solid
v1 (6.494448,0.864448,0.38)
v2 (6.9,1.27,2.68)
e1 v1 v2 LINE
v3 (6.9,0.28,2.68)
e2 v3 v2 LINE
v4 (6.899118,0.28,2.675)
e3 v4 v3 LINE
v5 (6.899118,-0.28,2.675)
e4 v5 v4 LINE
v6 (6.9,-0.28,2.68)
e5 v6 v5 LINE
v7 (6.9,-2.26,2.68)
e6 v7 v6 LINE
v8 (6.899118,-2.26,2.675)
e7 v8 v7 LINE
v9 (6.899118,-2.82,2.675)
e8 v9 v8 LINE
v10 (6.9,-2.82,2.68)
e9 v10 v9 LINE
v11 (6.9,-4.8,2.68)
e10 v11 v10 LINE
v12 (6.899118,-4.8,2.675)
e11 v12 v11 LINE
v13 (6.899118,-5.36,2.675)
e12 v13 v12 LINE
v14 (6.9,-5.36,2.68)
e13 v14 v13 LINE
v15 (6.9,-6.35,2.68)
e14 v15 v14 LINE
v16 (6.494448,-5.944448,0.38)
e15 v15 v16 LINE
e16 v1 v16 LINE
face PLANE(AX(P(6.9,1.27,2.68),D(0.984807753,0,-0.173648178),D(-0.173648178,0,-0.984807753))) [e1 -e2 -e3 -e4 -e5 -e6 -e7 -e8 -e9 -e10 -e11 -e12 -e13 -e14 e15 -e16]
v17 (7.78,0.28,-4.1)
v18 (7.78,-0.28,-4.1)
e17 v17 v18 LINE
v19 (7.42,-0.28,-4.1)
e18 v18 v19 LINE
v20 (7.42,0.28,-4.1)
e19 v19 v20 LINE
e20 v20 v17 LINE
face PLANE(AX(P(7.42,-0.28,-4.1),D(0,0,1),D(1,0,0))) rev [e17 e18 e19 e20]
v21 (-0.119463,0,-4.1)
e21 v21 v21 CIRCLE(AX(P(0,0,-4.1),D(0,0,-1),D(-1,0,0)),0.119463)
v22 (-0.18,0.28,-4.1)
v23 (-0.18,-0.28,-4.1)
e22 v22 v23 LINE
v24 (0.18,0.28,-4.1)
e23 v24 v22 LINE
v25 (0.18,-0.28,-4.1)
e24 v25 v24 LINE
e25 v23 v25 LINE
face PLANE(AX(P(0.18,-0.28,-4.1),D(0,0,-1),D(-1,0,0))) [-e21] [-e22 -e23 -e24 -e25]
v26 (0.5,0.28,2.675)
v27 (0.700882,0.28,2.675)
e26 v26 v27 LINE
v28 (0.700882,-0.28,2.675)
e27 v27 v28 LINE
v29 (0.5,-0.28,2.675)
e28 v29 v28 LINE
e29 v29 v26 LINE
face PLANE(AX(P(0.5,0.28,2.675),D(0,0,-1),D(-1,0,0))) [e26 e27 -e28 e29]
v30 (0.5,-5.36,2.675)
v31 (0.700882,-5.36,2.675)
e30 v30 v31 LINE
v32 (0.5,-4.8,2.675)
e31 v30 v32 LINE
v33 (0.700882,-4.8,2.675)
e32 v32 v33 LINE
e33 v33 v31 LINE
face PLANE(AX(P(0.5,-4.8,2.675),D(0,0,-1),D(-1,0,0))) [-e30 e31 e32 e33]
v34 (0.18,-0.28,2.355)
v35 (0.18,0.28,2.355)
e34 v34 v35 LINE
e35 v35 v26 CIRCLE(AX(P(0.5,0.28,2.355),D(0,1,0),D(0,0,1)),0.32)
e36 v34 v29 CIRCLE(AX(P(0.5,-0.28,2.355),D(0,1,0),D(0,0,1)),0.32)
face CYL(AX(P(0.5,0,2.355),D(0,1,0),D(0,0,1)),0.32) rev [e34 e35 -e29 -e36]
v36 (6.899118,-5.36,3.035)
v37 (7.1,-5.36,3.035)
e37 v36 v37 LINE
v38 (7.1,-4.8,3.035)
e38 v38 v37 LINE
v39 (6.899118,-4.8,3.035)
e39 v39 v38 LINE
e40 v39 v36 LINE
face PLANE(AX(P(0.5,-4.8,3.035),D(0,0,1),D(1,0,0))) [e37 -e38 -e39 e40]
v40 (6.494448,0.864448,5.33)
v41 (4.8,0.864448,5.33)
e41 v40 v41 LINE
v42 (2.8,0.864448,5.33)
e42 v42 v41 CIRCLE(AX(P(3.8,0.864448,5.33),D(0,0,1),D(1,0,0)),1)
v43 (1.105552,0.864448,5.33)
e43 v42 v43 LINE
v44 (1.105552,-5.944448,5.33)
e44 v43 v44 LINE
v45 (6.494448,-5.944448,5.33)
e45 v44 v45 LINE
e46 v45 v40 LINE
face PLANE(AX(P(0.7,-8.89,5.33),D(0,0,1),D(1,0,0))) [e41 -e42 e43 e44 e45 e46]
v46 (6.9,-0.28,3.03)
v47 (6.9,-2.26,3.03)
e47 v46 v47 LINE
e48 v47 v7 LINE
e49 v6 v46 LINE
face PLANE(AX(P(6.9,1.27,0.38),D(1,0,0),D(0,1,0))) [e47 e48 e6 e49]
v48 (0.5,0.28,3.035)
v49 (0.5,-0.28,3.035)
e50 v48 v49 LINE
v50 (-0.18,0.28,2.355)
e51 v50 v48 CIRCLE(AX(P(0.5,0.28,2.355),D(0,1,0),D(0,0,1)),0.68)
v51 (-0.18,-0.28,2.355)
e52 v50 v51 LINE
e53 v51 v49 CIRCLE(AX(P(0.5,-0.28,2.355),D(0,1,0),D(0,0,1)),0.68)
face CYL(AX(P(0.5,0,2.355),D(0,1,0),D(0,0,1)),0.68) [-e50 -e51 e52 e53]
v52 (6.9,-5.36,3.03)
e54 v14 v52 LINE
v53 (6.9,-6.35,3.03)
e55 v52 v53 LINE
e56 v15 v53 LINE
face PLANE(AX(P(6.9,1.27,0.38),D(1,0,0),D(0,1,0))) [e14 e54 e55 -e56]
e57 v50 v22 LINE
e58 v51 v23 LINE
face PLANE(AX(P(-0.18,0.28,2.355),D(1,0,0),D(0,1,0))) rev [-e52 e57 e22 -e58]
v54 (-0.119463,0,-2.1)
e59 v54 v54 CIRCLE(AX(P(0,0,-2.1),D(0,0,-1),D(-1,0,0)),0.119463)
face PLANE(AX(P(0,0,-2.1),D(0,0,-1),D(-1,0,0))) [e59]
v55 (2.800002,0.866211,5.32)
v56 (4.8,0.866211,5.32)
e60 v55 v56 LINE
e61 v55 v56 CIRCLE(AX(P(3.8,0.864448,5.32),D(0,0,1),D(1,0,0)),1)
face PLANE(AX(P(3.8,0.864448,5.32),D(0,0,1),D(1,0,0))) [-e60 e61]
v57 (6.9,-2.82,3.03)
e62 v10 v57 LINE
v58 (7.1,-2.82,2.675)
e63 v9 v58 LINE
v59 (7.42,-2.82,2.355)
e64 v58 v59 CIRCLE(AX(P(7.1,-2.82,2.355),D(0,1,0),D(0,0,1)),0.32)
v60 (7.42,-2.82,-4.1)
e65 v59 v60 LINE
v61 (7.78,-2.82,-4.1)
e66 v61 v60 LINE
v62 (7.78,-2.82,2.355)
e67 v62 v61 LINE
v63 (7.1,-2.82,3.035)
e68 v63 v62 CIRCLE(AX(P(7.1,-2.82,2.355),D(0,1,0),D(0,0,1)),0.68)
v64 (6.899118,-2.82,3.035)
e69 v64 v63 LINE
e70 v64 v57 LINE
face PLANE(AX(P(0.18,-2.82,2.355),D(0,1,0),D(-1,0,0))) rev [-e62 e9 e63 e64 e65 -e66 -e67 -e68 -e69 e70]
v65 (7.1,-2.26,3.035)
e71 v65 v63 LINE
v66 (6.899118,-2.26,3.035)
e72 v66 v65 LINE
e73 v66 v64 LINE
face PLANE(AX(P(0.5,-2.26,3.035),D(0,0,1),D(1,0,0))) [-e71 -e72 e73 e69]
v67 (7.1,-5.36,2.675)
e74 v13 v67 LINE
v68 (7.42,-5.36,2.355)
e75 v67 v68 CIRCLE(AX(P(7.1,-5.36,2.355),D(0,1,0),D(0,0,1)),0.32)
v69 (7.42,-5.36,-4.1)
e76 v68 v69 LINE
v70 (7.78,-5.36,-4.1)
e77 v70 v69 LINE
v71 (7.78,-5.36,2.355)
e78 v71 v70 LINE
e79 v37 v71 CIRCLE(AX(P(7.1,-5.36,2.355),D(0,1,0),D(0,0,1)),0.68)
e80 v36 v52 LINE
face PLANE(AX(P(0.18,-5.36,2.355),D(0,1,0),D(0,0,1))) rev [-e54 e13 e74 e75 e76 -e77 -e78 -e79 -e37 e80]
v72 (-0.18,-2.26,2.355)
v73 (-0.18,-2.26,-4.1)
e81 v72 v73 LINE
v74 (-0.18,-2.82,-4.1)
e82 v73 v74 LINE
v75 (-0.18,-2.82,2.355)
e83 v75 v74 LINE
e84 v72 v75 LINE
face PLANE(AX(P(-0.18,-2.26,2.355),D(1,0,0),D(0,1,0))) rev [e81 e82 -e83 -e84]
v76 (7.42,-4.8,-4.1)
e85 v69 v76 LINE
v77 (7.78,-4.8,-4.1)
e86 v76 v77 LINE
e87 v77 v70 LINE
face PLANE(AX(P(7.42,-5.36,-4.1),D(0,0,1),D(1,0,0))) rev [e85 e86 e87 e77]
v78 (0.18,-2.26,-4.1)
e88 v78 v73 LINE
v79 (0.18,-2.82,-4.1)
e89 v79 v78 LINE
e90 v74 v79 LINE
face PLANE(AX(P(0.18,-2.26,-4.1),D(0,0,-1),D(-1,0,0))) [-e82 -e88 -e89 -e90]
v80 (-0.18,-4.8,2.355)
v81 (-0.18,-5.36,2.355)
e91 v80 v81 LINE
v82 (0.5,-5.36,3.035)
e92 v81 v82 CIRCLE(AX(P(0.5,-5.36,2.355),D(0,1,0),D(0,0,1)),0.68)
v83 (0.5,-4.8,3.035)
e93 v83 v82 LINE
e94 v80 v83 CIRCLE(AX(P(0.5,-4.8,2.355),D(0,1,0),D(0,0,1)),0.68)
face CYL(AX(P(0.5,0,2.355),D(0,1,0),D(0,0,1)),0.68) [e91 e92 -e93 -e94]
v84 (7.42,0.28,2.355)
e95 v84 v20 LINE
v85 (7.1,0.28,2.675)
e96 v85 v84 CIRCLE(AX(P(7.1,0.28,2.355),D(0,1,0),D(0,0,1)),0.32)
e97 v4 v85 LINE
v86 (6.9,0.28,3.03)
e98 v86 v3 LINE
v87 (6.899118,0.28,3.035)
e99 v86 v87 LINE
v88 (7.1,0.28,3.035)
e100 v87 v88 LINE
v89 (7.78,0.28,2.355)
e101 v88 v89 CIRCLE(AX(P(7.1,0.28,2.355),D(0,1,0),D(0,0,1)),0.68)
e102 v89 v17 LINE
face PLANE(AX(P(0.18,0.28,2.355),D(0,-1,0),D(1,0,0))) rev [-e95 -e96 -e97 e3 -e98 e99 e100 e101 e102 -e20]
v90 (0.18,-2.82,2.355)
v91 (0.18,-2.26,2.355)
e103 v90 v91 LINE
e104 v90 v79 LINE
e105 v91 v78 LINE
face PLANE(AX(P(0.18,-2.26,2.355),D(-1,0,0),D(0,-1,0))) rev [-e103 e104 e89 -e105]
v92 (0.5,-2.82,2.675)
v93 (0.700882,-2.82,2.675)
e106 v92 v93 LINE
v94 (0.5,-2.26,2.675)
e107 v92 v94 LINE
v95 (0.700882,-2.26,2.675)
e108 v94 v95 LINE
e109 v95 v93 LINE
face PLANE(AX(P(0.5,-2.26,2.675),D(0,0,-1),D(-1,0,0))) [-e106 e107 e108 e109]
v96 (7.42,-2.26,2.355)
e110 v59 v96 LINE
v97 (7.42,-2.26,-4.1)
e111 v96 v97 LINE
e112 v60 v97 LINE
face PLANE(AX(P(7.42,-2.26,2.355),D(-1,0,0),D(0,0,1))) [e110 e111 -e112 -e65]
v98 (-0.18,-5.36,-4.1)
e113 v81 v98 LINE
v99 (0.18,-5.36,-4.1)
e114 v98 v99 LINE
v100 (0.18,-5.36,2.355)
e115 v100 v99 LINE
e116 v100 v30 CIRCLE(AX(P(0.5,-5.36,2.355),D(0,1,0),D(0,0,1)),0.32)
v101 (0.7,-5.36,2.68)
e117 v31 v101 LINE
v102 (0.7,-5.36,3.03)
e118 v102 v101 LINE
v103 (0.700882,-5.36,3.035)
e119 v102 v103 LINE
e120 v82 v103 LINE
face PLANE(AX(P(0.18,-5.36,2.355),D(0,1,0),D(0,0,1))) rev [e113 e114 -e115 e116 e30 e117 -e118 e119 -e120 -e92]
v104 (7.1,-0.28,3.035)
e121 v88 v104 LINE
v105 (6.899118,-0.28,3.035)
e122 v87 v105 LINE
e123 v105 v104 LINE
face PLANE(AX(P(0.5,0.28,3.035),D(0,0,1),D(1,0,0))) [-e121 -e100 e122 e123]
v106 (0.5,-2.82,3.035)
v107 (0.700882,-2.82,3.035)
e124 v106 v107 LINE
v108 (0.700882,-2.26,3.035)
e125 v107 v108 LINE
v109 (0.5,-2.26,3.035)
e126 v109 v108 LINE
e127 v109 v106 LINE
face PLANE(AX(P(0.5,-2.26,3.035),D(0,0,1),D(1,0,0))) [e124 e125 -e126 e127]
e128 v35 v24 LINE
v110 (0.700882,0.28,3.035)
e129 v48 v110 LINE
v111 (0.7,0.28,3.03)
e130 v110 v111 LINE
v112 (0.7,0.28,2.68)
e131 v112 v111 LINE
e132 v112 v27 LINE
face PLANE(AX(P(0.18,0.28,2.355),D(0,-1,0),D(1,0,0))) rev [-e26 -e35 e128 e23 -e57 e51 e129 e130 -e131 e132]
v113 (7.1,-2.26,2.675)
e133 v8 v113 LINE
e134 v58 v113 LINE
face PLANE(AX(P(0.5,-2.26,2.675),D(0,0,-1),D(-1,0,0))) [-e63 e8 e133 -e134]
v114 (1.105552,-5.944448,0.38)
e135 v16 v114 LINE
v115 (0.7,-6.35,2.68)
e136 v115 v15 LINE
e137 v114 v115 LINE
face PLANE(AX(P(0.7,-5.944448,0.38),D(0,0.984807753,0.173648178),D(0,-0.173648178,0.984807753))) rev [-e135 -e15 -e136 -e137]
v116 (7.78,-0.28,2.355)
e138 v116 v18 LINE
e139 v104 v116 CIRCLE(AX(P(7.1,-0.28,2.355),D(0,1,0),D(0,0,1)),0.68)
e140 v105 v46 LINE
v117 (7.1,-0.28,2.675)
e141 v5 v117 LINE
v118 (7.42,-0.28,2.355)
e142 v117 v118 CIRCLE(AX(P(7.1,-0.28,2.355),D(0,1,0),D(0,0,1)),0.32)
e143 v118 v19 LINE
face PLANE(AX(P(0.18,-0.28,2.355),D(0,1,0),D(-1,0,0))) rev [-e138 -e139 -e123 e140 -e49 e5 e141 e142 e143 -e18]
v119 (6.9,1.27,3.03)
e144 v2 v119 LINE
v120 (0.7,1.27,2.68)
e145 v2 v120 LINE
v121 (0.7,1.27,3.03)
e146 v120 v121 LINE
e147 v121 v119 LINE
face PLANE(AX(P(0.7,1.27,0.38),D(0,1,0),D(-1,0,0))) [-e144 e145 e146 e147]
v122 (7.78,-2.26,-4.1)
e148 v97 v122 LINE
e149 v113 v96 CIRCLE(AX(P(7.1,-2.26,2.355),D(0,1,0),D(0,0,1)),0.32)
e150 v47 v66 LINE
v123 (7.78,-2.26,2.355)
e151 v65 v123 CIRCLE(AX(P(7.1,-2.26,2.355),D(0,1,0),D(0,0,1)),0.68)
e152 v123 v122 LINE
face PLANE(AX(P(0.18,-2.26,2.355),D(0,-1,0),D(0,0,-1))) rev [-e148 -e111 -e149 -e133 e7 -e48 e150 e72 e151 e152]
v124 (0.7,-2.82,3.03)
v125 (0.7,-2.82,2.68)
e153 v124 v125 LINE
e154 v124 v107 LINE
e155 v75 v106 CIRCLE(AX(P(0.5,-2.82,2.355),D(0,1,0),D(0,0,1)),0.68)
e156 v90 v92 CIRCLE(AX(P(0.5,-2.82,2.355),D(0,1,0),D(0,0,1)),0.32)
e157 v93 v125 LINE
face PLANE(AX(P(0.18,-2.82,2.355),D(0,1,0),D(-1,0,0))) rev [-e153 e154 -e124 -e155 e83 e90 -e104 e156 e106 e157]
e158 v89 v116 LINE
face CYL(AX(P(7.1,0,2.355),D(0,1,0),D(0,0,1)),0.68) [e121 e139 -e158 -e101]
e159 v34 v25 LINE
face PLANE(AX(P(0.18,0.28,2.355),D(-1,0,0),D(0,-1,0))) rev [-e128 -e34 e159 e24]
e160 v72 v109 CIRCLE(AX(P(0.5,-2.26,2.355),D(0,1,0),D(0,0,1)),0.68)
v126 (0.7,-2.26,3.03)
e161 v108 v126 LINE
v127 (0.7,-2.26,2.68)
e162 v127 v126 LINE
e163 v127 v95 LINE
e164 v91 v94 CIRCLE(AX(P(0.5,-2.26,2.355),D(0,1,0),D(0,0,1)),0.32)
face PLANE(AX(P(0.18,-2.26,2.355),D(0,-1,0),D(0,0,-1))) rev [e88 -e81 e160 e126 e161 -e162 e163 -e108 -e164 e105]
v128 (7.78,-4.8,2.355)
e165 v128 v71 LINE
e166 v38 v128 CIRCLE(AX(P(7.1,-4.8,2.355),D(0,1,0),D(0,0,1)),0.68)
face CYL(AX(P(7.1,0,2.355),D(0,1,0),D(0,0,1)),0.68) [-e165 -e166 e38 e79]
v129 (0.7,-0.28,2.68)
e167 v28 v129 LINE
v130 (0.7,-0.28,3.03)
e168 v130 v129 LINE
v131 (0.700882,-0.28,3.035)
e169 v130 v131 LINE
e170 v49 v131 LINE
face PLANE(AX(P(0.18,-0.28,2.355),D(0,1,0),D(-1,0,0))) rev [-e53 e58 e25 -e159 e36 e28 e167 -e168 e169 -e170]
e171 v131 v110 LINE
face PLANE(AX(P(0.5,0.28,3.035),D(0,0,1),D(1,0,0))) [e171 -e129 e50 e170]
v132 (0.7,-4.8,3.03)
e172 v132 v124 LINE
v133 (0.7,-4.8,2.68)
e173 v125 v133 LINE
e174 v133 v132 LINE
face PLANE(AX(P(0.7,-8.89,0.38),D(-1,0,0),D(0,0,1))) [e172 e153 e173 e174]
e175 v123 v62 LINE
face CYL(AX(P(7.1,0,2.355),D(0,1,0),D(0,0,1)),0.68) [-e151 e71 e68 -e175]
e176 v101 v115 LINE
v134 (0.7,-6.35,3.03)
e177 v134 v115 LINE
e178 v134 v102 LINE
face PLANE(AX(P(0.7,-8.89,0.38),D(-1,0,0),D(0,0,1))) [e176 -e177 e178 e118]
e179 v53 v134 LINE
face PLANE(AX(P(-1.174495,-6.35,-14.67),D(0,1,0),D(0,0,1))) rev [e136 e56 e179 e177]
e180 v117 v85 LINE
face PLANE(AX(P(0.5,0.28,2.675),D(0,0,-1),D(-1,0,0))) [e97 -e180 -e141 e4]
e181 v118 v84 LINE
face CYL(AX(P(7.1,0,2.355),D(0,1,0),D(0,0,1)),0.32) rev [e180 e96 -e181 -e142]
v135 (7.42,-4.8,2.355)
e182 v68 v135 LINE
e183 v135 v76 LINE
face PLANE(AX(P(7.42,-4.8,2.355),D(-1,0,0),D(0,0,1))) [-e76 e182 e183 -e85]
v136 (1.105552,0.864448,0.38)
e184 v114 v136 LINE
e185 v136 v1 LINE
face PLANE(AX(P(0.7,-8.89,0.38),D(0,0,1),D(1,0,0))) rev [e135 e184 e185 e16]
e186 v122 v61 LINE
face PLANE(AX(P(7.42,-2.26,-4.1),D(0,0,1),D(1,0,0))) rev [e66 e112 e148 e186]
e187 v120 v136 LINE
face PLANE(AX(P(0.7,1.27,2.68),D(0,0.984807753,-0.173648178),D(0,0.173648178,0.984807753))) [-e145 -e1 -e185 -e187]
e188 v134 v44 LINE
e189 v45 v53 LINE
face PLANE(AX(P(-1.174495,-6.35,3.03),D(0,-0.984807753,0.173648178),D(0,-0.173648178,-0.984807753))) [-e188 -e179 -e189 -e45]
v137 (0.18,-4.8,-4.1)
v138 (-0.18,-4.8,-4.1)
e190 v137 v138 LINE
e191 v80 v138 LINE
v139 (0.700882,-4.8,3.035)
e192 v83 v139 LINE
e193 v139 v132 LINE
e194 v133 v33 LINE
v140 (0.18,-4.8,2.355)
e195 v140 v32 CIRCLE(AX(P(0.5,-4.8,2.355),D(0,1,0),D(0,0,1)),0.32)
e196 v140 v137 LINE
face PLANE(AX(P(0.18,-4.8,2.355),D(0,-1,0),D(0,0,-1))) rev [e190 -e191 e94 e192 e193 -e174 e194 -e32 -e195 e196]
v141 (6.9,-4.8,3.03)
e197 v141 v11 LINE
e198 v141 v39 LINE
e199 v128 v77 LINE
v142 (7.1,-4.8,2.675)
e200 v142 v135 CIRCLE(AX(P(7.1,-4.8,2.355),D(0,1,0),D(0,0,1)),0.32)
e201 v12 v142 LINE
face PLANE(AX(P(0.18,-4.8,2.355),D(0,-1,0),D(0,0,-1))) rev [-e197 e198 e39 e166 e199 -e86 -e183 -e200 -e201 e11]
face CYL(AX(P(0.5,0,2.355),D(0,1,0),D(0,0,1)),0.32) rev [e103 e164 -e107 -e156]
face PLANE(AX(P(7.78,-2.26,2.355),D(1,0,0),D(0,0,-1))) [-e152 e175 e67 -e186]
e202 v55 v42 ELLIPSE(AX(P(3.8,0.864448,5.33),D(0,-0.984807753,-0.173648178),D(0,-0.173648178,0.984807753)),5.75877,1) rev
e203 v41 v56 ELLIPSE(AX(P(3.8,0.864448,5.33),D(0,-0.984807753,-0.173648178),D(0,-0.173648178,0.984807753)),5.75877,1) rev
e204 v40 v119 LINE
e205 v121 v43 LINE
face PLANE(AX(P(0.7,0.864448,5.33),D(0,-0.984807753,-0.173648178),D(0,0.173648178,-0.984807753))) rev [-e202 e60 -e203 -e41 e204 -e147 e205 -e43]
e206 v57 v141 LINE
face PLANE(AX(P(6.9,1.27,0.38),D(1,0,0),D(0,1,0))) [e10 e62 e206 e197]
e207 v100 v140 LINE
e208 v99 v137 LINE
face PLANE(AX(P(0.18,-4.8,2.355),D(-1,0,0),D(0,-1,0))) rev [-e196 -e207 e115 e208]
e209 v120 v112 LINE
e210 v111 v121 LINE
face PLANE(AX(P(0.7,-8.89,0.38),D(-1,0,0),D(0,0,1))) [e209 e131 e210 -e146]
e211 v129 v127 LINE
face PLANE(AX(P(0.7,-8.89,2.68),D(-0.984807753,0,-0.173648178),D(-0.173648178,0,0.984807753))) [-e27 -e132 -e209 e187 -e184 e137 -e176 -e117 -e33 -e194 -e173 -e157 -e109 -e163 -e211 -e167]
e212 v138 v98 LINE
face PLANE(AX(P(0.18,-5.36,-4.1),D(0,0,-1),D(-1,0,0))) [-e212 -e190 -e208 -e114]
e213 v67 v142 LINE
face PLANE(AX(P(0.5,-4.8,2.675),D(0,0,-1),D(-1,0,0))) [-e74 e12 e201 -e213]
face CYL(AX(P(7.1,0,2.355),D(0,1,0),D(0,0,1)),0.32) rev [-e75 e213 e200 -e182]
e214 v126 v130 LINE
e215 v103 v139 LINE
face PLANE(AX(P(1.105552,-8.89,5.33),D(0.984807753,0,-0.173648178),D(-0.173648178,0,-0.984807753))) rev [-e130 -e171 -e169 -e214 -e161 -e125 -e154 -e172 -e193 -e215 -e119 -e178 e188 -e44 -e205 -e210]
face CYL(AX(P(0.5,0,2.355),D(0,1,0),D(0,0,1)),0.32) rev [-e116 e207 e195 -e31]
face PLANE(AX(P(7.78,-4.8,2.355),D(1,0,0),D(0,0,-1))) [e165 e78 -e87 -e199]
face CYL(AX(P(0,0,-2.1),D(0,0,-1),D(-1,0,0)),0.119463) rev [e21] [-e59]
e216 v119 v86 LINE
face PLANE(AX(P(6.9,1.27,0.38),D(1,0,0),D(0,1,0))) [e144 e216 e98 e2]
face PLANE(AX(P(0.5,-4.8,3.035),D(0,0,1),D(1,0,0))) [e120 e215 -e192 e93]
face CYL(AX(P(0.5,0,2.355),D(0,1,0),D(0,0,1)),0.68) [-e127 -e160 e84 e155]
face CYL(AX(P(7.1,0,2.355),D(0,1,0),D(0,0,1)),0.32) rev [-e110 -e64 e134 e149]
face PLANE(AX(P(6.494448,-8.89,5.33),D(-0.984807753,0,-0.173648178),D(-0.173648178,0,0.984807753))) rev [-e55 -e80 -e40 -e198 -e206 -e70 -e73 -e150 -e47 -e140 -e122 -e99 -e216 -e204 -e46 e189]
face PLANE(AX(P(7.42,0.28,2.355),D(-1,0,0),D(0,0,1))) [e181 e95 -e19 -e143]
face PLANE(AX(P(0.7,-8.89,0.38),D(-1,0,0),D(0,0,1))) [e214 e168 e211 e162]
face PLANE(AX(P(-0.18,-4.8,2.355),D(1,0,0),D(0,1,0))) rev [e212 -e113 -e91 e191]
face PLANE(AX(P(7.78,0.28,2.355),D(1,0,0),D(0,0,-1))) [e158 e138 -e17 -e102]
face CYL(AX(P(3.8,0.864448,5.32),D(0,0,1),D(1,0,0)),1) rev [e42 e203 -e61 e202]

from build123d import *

# Parameters (mm, degrees)
EXTRUDE_1_DEPTH     = 4.95
SKETCH_5_W          = 0.36
SKETCH_5_H          = 0.56
SKETCH_5_2_W        = 0.36
SKETCH_5_2_H        = 0.56
EXTRUDE_2_DEPTH     = 4.1
CHAMFER_1_SIZE      = 2.3
CHAMFER_1_SIZE_2    = 0.405552056
SKETCH_6_R          = 1
CUT_EXTRUDE_1_DEPTH = 0.01
SKETCH_7_W          = 10.556189846
SKETCH_7_H          = 3.652287582
CUT_EXTRUDE_2_DEPTH = 20
CHAMFER_2_SIZE      = 2.3
CHAMFER_2_SIZE2     = 0.405552056
SKETCH_8_R          = 0.119462925
CUT_EXTRUDE_3_DEPTH = 2


with BuildPart() as part:
    # Эскиз3 → Вытянуть1 (new body)
    with BuildSketch(Plane.XY.offset(5.33)):
        Polygon((0.7, 1.27), (3.8, 1.27), (6.9, 1.27), (6.9, -8.89), (0.7, -8.89), align=None)
    extrude(amount=-EXTRUDE_1_DEPTH)

    # По траектории1: sweep along a path in Эскиз4
    with BuildLine(Plane(origin=(0, 0, 0), x_dir=(1, 0, 0), z_dir=(0, 1, 0))) as sweep_1_path:
        Line((0, 0), (0, -2.355))
        ThreePointArc((0, -2.355), (0.146446609, -2.708553391), (0.5, -2.855))
        Line((0.5, -2.855), (0.7, -2.855))
        Line((0.7, -2.855), (6.9, -2.855))
        Line((6.9, -2.855), (7.1, -2.855))
        ThreePointArc((7.1, -2.855), (7.453553391, -2.708553391), (7.6, -2.355))
        Line((7.6, -2.355), (7.6, 0))
        Line((7.6, 0), (7.6, 4.1))
    # Эскиз5 → По траектории1 (sweep)
    with BuildSketch(Plane.XY):
        with Locations((0, -2.54)):
            Rectangle(SKETCH_5_W, SKETCH_5_H)
        Rectangle(SKETCH_5_W, SKETCH_5_H)
        with Locations((0, -5.08)):
            Rectangle(SKETCH_5_W, SKETCH_5_H)
        with Locations((0, -7.62)):
            Rectangle(SKETCH_5_W, SKETCH_5_H)
    sweep(path=sweep_1_path.line)

    # Эскиз5<2> → Вытянуть2 (add)
    with BuildSketch(Plane.XY):
        with Locations((0, -2.54)):
            Rectangle(SKETCH_5_2_W, SKETCH_5_2_H)
        Rectangle(SKETCH_5_2_W, SKETCH_5_2_H)
        with Locations((0, -5.08)):
            Rectangle(SKETCH_5_2_W, SKETCH_5_2_H)
        with Locations((0, -7.62)):
            Rectangle(SKETCH_5_2_W, SKETCH_5_2_H)
    extrude(amount=-EXTRUDE_2_DEPTH)

    # Фаска1
    # the kernel refuses this chamfer: 2.3, 0.405552056 mm, written as the material it takes off along each edge
    with BuildSketch(Plane(origin=(12.876639232, -8.89, 0.38), x_dir=(0, -0.006682531656101655, 0.9999776716360548), z_dir=(-1, 0, 0))) as chamfer_1_piece_1:
        Polygon((CHAMFER_1_SIZE * 0.999977671636, CHAMFER_1_SIZE * 0.0066825316561), (-CHAMFER_1_SIZE_2 * 0.00668253165, CHAMFER_1_SIZE_2 * 0.999977670722), (0, 0), align=None)
    extrude(amount=18.153278464, mode=Mode.SUBTRACT)
    with BuildSketch(Plane(origin=(12.876639232, -8.89, 5.33), x_dir=(0, 0.9776715712462588, 0.2101387607674306), z_dir=(-1, 0, 0))) as chamfer_1_piece_2:
        Polygon((CHAMFER_1_SIZE_2 * 0.977671570353, CHAMFER_1_SIZE_2 * 0.210138760575), (-CHAMFER_1_SIZE * 0.210138760767, CHAMFER_1_SIZE * 0.977671571246), (0, 0), align=None)
    extrude(amount=18.153278464, mode=Mode.SUBTRACT)
    with BuildSketch(Plane(origin=(6.9, 7.246639232, 0.38), x_dir=(0.006682531656101655, 0, 0.9999776716360548), z_dir=(0, -1, 0))) as chamfer_1_piece_3_section:
        Polygon((CHAMFER_1_SIZE * 0.999977671636, CHAMFER_1_SIZE * 0.0066825316561), (-CHAMFER_1_SIZE_2 * 0.00668253165, CHAMFER_1_SIZE_2 * 0.999977670722), (0, 0), align=None)
    chamfer_1_piece_3 = extrude(amount=22.113278464, mode=Mode.PRIVATE)
    chamfer_1_piece_3 = split(chamfer_1_piece_3, bisect_by=Plane(origin=(6.899706122, 0.28, 2.676666667), z_dir=(0, 1, 0)), keep=Keep.TOP, mode=Mode.PRIVATE)
    add(chamfer_1_piece_3, mode=Mode.SUBTRACT)
    with BuildSketch(Plane(origin=(6.9, 7.246639232, 0.38), x_dir=(0.006682531656101655, 0, 0.9999776716360548), z_dir=(0, -1, 0))) as chamfer_1_piece_4_section:
        Polygon((CHAMFER_1_SIZE * 0.999977671636, CHAMFER_1_SIZE * 0.0066825316561), (-CHAMFER_1_SIZE_2 * 0.00668253165, CHAMFER_1_SIZE_2 * 0.999977670722), (0, 0), align=None)
    chamfer_1_piece_4 = extrude(amount=22.113278464, mode=Mode.PRIVATE)
    chamfer_1_piece_4 = split(chamfer_1_piece_4, bisect_by=Plane(origin=(6.764815344, 0, 2.675), z_dir=(0, 0, -1)), keep=Keep.TOP, mode=Mode.PRIVATE)
    add(chamfer_1_piece_4, mode=Mode.SUBTRACT)
    with BuildSketch(Plane(origin=(6.9, 7.246639232, 0.38), x_dir=(0.006682531656101655, 0, 0.9999776716360548), z_dir=(0, -1, 0))) as chamfer_1_piece_5_section:
        Polygon((CHAMFER_1_SIZE * 0.999977671636, CHAMFER_1_SIZE * 0.0066825316561), (-CHAMFER_1_SIZE_2 * 0.00668253165, CHAMFER_1_SIZE_2 * 0.999977670722), (0, 0), align=None)
    chamfer_1_piece_5 = extrude(amount=22.113278464, mode=Mode.PRIVATE)
    chamfer_1_piece_5 = split(chamfer_1_piece_5, bisect_by=Plane(origin=(6.899706122, -2.26, 2.676666667), z_dir=(0, 1, 0)), keep=Keep.TOP, mode=Mode.PRIVATE)
    chamfer_1_piece_5 = split(chamfer_1_piece_5, bisect_by=Plane(origin=(6.899706122, -0.28, 2.676666667), z_dir=(0, -1, 0)), keep=Keep.TOP, mode=Mode.PRIVATE)
    add(chamfer_1_piece_5, mode=Mode.SUBTRACT)
    with BuildSketch(Plane(origin=(6.9, 7.246639232, 0.38), x_dir=(0.006682531656101655, 0, 0.9999776716360548), z_dir=(0, -1, 0))) as chamfer_1_piece_6_section:
        Polygon((CHAMFER_1_SIZE * 0.999977671636, CHAMFER_1_SIZE * 0.0066825316561), (-CHAMFER_1_SIZE_2 * 0.00668253165, CHAMFER_1_SIZE_2 * 0.999977670722), (0, 0), align=None)
    chamfer_1_piece_6 = extrude(amount=22.113278464, mode=Mode.PRIVATE)
    chamfer_1_piece_6 = split(chamfer_1_piece_6, bisect_by=Plane(origin=(6.899706122, -2.82, 2.676666667), z_dir=(0, -1, 0)), keep=Keep.TOP, mode=Mode.PRIVATE)
    chamfer_1_piece_6 = split(chamfer_1_piece_6, bisect_by=Plane(origin=(6.899706122, -4.8, 2.676666667), z_dir=(0, 1, 0)), keep=Keep.TOP, mode=Mode.PRIVATE)
    add(chamfer_1_piece_6, mode=Mode.SUBTRACT)
    with BuildSketch(Plane(origin=(6.9, 7.246639232, 0.38), x_dir=(0.006682531656101655, 0, 0.9999776716360548), z_dir=(0, -1, 0))) as chamfer_1_piece_7_section:
        Polygon((CHAMFER_1_SIZE * 0.999977671636, CHAMFER_1_SIZE * 0.0066825316561), (-CHAMFER_1_SIZE_2 * 0.00668253165, CHAMFER_1_SIZE_2 * 0.999977670722), (0, 0), align=None)
    chamfer_1_piece_7 = extrude(amount=22.113278464, mode=Mode.PRIVATE)
    chamfer_1_piece_7 = split(chamfer_1_piece_7, bisect_by=Plane(origin=(6.899706122, -7.34, 2.676666667), z_dir=(0, 1, 0)), keep=Keep.TOP, mode=Mode.PRIVATE)
    chamfer_1_piece_7 = split(chamfer_1_piece_7, bisect_by=Plane(origin=(6.899706122, -5.36, 2.676666667), z_dir=(0, -1, 0)), keep=Keep.TOP, mode=Mode.PRIVATE)
    add(chamfer_1_piece_7, mode=Mode.SUBTRACT)
    with BuildSketch(Plane(origin=(6.9, 7.246639232, 0.38), x_dir=(0.006682531656101655, 0, 0.9999776716360548), z_dir=(0, -1, 0))) as chamfer_1_piece_8_section:
        Polygon((CHAMFER_1_SIZE * 0.999977671636, CHAMFER_1_SIZE * 0.0066825316561), (-CHAMFER_1_SIZE_2 * 0.00668253165, CHAMFER_1_SIZE_2 * 0.999977670722), (0, 0), align=None)
    chamfer_1_piece_8 = extrude(amount=22.113278464, mode=Mode.PRIVATE)
    chamfer_1_piece_8 = split(chamfer_1_piece_8, bisect_by=Plane(origin=(6.899706122, -7.9, 2.676666667), z_dir=(0, -1, 0)), keep=Keep.TOP, mode=Mode.PRIVATE)
    add(chamfer_1_piece_8, mode=Mode.SUBTRACT)
    with BuildSketch(Plane(origin=(6.9, 7.246639232, 5.33), x_dir=(-0.9776715712462587, 0, 0.21013876076743102), z_dir=(0, -1, 0))) as chamfer_1_piece_9_section:
        Polygon((CHAMFER_1_SIZE_2 * 0.977671570353, CHAMFER_1_SIZE_2 * 0.210138760575), (-CHAMFER_1_SIZE * 0.210138760767, CHAMFER_1_SIZE * 0.977671571246), (0, 0), align=None)
    chamfer_1_piece_9 = extrude(amount=22.113278464, mode=Mode.PRIVATE)
    chamfer_1_piece_9 = split(chamfer_1_piece_9, bisect_by=Plane(origin=(6.764815344, 0.775, 3.035), z_dir=(0, 0, 1)), keep=Keep.TOP, mode=Mode.PRIVATE)
    add(chamfer_1_piece_9, mode=Mode.SUBTRACT)
    with BuildSketch(Plane(origin=(6.9, 7.246639232, 5.33), x_dir=(-0.9776715712462587, 0, 0.21013876076743102), z_dir=(0, -1, 0))) as chamfer_1_piece_10_section:
        Polygon((CHAMFER_1_SIZE_2 * 0.977671570353, CHAMFER_1_SIZE_2 * 0.210138760575), (-CHAMFER_1_SIZE * 0.210138760767, CHAMFER_1_SIZE * 0.977671571246), (0, 0), align=None)
    chamfer_1_piece_10 = extrude(amount=22.113278464, mode=Mode.PRIVATE)
    chamfer_1_piece_10 = split(chamfer_1_piece_10, bisect_by=Plane(origin=(6.899706122, 0.28, 3.033333333), z_dir=(0, 1, 0)), keep=Keep.TOP, mode=Mode.PRIVATE)
    add(chamfer_1_piece_10, mode=Mode.SUBTRACT)
    with BuildSketch(Plane(origin=(6.9, 7.246639232, 5.33), x_dir=(-0.9776715712462587, 0, 0.21013876076743102), z_dir=(0, -1, 0))) as chamfer_1_piece_11_section:
        Polygon((CHAMFER_1_SIZE_2 * 0.977671570353, CHAMFER_1_SIZE_2 * 0.210138760575), (-CHAMFER_1_SIZE * 0.210138760767, CHAMFER_1_SIZE * 0.977671571246), (0, 0), align=None)
    chamfer_1_piece_11 = extrude(amount=22.113278464, mode=Mode.PRIVATE)
    chamfer_1_piece_11 = split(chamfer_1_piece_11, bisect_by=Plane(origin=(6.899706122, -2.26, 3.033333333), z_dir=(0, 1, 0)), keep=Keep.TOP, mode=Mode.PRIVATE)
    chamfer_1_piece_11 = split(chamfer_1_piece_11, bisect_by=Plane(origin=(6.899706122, -0.28, 3.033333333), z_dir=(0, -1, 0)), keep=Keep.TOP, mode=Mode.PRIVATE)
    add(chamfer_1_piece_11, mode=Mode.SUBTRACT)
    with BuildSketch(Plane(origin=(6.9, 7.246639232, 5.33), x_dir=(-0.9776715712462587, 0, 0.21013876076743102), z_dir=(0, -1, 0))) as chamfer_1_piece_12_section:
        Polygon((CHAMFER_1_SIZE_2 * 0.977671570353, CHAMFER_1_SIZE_2 * 0.210138760575), (-CHAMFER_1_SIZE * 0.210138760767, CHAMFER_1_SIZE * 0.977671571246), (0, 0), align=None)
    chamfer_1_piece_12 = extrude(amount=22.113278464, mode=Mode.PRIVATE)
    chamfer_1_piece_12 = split(chamfer_1_piece_12, bisect_by=Plane(origin=(6.899706122, -2.82, 3.033333333), z_dir=(0, -1, 0)), keep=Keep.TOP, mode=Mode.PRIVATE)
    chamfer_1_piece_12 = split(chamfer_1_piece_12, bisect_by=Plane(origin=(6.899706122, -4.8, 3.033333333), z_dir=(0, 1, 0)), keep=Keep.TOP, mode=Mode.PRIVATE)
    add(chamfer_1_piece_12, mode=Mode.SUBTRACT)
    with BuildSketch(Plane(origin=(6.9, 7.246639232, 5.33), x_dir=(-0.9776715712462587, 0, 0.21013876076743102), z_dir=(0, -1, 0))) as chamfer_1_piece_13_section:
        Polygon((CHAMFER_1_SIZE_2 * 0.977671570353, CHAMFER_1_SIZE_2 * 0.210138760575), (-CHAMFER_1_SIZE * 0.210138760767, CHAMFER_1_SIZE * 0.977671571246), (0, 0), align=None)
    chamfer_1_piece_13 = extrude(amount=22.113278464, mode=Mode.PRIVATE)
    chamfer_1_piece_13 = split(chamfer_1_piece_13, bisect_by=Plane(origin=(6.899706122, -7.34, 3.033333333), z_dir=(0, 1, 0)), keep=Keep.TOP, mode=Mode.PRIVATE)
    chamfer_1_piece_13 = split(chamfer_1_piece_13, bisect_by=Plane(origin=(6.899706122, -5.36, 3.033333333), z_dir=(0, -1, 0)), keep=Keep.TOP, mode=Mode.PRIVATE)
    add(chamfer_1_piece_13, mode=Mode.SUBTRACT)
    with BuildSketch(Plane(origin=(6.9, 7.246639232, 5.33), x_dir=(-0.9776715712462587, 0, 0.21013876076743102), z_dir=(0, -1, 0))) as chamfer_1_piece_14_section:
        Polygon((CHAMFER_1_SIZE_2 * 0.977671570353, CHAMFER_1_SIZE_2 * 0.210138760575), (-CHAMFER_1_SIZE * 0.210138760767, CHAMFER_1_SIZE * 0.977671571246), (0, 0), align=None)
    chamfer_1_piece_14 = extrude(amount=22.113278464, mode=Mode.PRIVATE)
    chamfer_1_piece_14 = split(chamfer_1_piece_14, bisect_by=Plane(origin=(6.899706122, -7.9, 3.033333333), z_dir=(0, -1, 0)), keep=Keep.TOP, mode=Mode.PRIVATE)
    add(chamfer_1_piece_14, mode=Mode.SUBTRACT)
    with BuildSketch(Plane(origin=(12.876639232, 1.27, 0.38), x_dir=(0, 0.006682531656101748, 0.9999776716360548), z_dir=(-1, 0, 0)), Plane(origin=(-5.276639232, 1.27, 5.33), x_dir=(0, 0.006682531656101748, -0.9999776716360548), z_dir=(1, 0, 0))) as chamfer_1_piece_15:
        Polygon((CHAMFER_1_SIZE * 0.999977671636, -CHAMFER_1_SIZE * 0.0066825316561), (-CHAMFER_1_SIZE_2 * 0.00668253165, -CHAMFER_1_SIZE_2 * 0.999977670722), (0, 0), align=None)
    extrude(amount=18.153278464, mode=Mode.SUBTRACT)
    with BuildSketch(Plane(origin=(0.7, -14.866639232, 0.38), x_dir=(0.9776715712462587, 0, -0.2101387607674313), z_dir=(0, 1, 0))) as chamfer_1_piece_16_section:
        Polygon((CHAMFER_1_SIZE_2 * 0.977671570353, -CHAMFER_1_SIZE_2 * 0.210138760575), (-CHAMFER_1_SIZE * 0.210138760767, -CHAMFER_1_SIZE * 0.977671571246), (0, 0), align=None)
    chamfer_1_piece_16 = extrude(amount=22.113278464, mode=Mode.PRIVATE)
    chamfer_1_piece_16 = split(chamfer_1_piece_16, bisect_by=Plane(origin=(0.835184656, -8.395, 2.675), z_dir=(0, 0, -1)), keep=Keep.TOP, mode=Mode.PRIVATE)
    add(chamfer_1_piece_16, mode=Mode.SUBTRACT)
    with BuildSketch(Plane(origin=(0.7, -14.866639232, 0.38), x_dir=(0.9776715712462587, 0, -0.2101387607674313), z_dir=(0, 1, 0))) as chamfer_1_piece_17_section:
        Polygon((CHAMFER_1_SIZE_2 * 0.977671570353, -CHAMFER_1_SIZE_2 * 0.210138760575), (-CHAMFER_1_SIZE * 0.210138760767, -CHAMFER_1_SIZE * 0.977671571246), (0, 0), align=None)
    chamfer_1_piece_17 = extrude(amount=22.113278464, mode=Mode.PRIVATE)
    chamfer_1_piece_17 = split(chamfer_1_piece_17, bisect_by=Plane(origin=(0.700293878, -7.9, 2.676666667), z_dir=(0, -1, 0)), keep=Keep.TOP, mode=Mode.PRIVATE)
    add(chamfer_1_piece_17, mode=Mode.SUBTRACT)
    with BuildSketch(Plane(origin=(0.7, -14.866639232, 0.38), x_dir=(0.9776715712462587, 0, -0.2101387607674313), z_dir=(0, 1, 0))) as chamfer_1_piece_18_section:
        Polygon((CHAMFER_1_SIZE_2 * 0.977671570353, -CHAMFER_1_SIZE_2 * 0.210138760575), (-CHAMFER_1_SIZE * 0.210138760767, -CHAMFER_1_SIZE * 0.977671571246), (0, 0), align=None)
    chamfer_1_piece_18 = extrude(amount=22.113278464, mode=Mode.PRIVATE)
    chamfer_1_piece_18 = split(chamfer_1_piece_18, bisect_by=Plane(origin=(0.700293878, -5.36, 2.676666667), z_dir=(0, -1, 0)), keep=Keep.TOP, mode=Mode.PRIVATE)
    chamfer_1_piece_18 = split(chamfer_1_piece_18, bisect_by=Plane(origin=(0.700293878, -7.34, 2.676666667), z_dir=(0, 1, 0)), keep=Keep.TOP, mode=Mode.PRIVATE)
    add(chamfer_1_piece_18, mode=Mode.SUBTRACT)
    with BuildSketch(Plane(origin=(0.7, -14.866639232, 0.38), x_dir=(0.9776715712462587, 0, -0.2101387607674313), z_dir=(0, 1, 0))) as chamfer_1_piece_19_section:
        Polygon((CHAMFER_1_SIZE_2 * 0.977671570353, -CHAMFER_1_SIZE_2 * 0.210138760575), (-CHAMFER_1_SIZE * 0.210138760767, -CHAMFER_1_SIZE * 0.977671571246), (0, 0), align=None)
    chamfer_1_piece_19 = extrude(amount=22.113278464, mode=Mode.PRIVATE)
    chamfer_1_piece_19 = split(chamfer_1_piece_19, bisect_by=Plane(origin=(0.700293878, -2.82, 2.676666667), z_dir=(0, -1, 0)), keep=Keep.TOP, mode=Mode.PRIVATE)
    chamfer_1_piece_19 = split(chamfer_1_piece_19, bisect_by=Plane(origin=(0.700293878, -4.8, 2.676666667), z_dir=(0, 1, 0)), keep=Keep.TOP, mode=Mode.PRIVATE)
    add(chamfer_1_piece_19, mode=Mode.SUBTRACT)
    with BuildSketch(Plane(origin=(0.7, -14.866639232, 0.38), x_dir=(0.9776715712462587, 0, -0.2101387607674313), z_dir=(0, 1, 0))) as chamfer_1_piece_20_section:
        Polygon((CHAMFER_1_SIZE_2 * 0.977671570353, -CHAMFER_1_SIZE_2 * 0.210138760575), (-CHAMFER_1_SIZE * 0.210138760767, -CHAMFER_1_SIZE * 0.977671571246), (0, 0), align=None)
    chamfer_1_piece_20 = extrude(amount=22.113278464, mode=Mode.PRIVATE)
    chamfer_1_piece_20 = split(chamfer_1_piece_20, bisect_by=Plane(origin=(0.700293878, -0.28, 2.676666667), z_dir=(0, -1, 0)), keep=Keep.TOP, mode=Mode.PRIVATE)
    chamfer_1_piece_20 = split(chamfer_1_piece_20, bisect_by=Plane(origin=(0.700293878, -2.26, 2.676666667), z_dir=(0, 1, 0)), keep=Keep.TOP, mode=Mode.PRIVATE)
    add(chamfer_1_piece_20, mode=Mode.SUBTRACT)
    with BuildSketch(Plane(origin=(0.7, -14.866639232, 0.38), x_dir=(0.9776715712462587, 0, -0.2101387607674313), z_dir=(0, 1, 0))) as chamfer_1_piece_21_section:
        Polygon((CHAMFER_1_SIZE_2 * 0.977671570353, -CHAMFER_1_SIZE_2 * 0.210138760575), (-CHAMFER_1_SIZE * 0.210138760767, -CHAMFER_1_SIZE * 0.977671571246), (0, 0), align=None)
    chamfer_1_piece_21 = extrude(amount=22.113278464, mode=Mode.PRIVATE)
    chamfer_1_piece_21 = split(chamfer_1_piece_21, bisect_by=Plane(origin=(0.700293878, 0.28, 2.676666667), z_dir=(0, 1, 0)), keep=Keep.TOP, mode=Mode.PRIVATE)
    add(chamfer_1_piece_21, mode=Mode.SUBTRACT)
    with BuildSketch(Plane(origin=(0.7, -14.866639232, 5.33), x_dir=(0.9776715712462587, 0, 0.2101387607674309), z_dir=(0, 1, 0))) as chamfer_1_piece_22_section:
        Polygon((CHAMFER_1_SIZE_2 * 0.977671570353, CHAMFER_1_SIZE_2 * 0.210138760575), (-CHAMFER_1_SIZE * 0.210138760767, CHAMFER_1_SIZE * 0.977671571246), (0, 0), align=None)
    chamfer_1_piece_22 = extrude(amount=22.113278464, mode=Mode.PRIVATE)
    chamfer_1_piece_22 = split(chamfer_1_piece_22, bisect_by=Plane(origin=(0.835184656, -8.395, 3.035), z_dir=(0, 0, 1)), keep=Keep.TOP, mode=Mode.PRIVATE)
    add(chamfer_1_piece_22, mode=Mode.SUBTRACT)
    with BuildSketch(Plane(origin=(0.7, -14.866639232, 5.33), x_dir=(0.9776715712462587, 0, 0.2101387607674309), z_dir=(0, 1, 0))) as chamfer_1_piece_23_section:
        Polygon((CHAMFER_1_SIZE_2 * 0.977671570353, CHAMFER_1_SIZE_2 * 0.210138760575), (-CHAMFER_1_SIZE * 0.210138760767, CHAMFER_1_SIZE * 0.977671571246), (0, 0), align=None)
    chamfer_1_piece_23 = extrude(amount=22.113278464, mode=Mode.PRIVATE)
    chamfer_1_piece_23 = split(chamfer_1_piece_23, bisect_by=Plane(origin=(0.700293878, -7.9, 3.033333333), z_dir=(0, -1, 0)), keep=Keep.TOP, mode=Mode.PRIVATE)
    add(chamfer_1_piece_23, mode=Mode.SUBTRACT)
    with BuildSketch(Plane(origin=(0.7, -14.866639232, 5.33), x_dir=(0.9776715712462587, 0, 0.2101387607674309), z_dir=(0, 1, 0))) as chamfer_1_piece_24_section:
        Polygon((CHAMFER_1_SIZE_2 * 0.977671570353, CHAMFER_1_SIZE_2 * 0.210138760575), (-CHAMFER_1_SIZE * 0.210138760767, CHAMFER_1_SIZE * 0.977671571246), (0, 0), align=None)
    chamfer_1_piece_24 = extrude(amount=22.113278464, mode=Mode.PRIVATE)
    chamfer_1_piece_24 = split(chamfer_1_piece_24, bisect_by=Plane(origin=(0.700293878, -5.36, 3.033333333), z_dir=(0, -1, 0)), keep=Keep.TOP, mode=Mode.PRIVATE)
    chamfer_1_piece_24 = split(chamfer_1_piece_24, bisect_by=Plane(origin=(0.700293878, -7.34, 3.033333333), z_dir=(0, 1, 0)), keep=Keep.TOP, mode=Mode.PRIVATE)
    add(chamfer_1_piece_24, mode=Mode.SUBTRACT)
    with BuildSketch(Plane(origin=(0.7, -14.866639232, 5.33), x_dir=(0.9776715712462587, 0, 0.2101387607674309), z_dir=(0, 1, 0))) as chamfer_1_piece_25_section:
        Polygon((CHAMFER_1_SIZE_2 * 0.977671570353, CHAMFER_1_SIZE_2 * 0.210138760575), (-CHAMFER_1_SIZE * 0.210138760767, CHAMFER_1_SIZE * 0.977671571246), (0, 0), align=None)
    chamfer_1_piece_25 = extrude(amount=22.113278464, mode=Mode.PRIVATE)
    chamfer_1_piece_25 = split(chamfer_1_piece_25, bisect_by=Plane(origin=(0.700293878, -2.82, 3.033333333), z_dir=(0, -1, 0)), keep=Keep.TOP, mode=Mode.PRIVATE)
    chamfer_1_piece_25 = split(chamfer_1_piece_25, bisect_by=Plane(origin=(0.700293878, -4.8, 3.033333333), z_dir=(0, 1, 0)), keep=Keep.TOP, mode=Mode.PRIVATE)
    add(chamfer_1_piece_25, mode=Mode.SUBTRACT)
    with BuildSketch(Plane(origin=(0.7, -14.866639232, 5.33), x_dir=(0.9776715712462587, 0, 0.2101387607674309), z_dir=(0, 1, 0))) as chamfer_1_piece_26_section:
        Polygon((CHAMFER_1_SIZE_2 * 0.977671570353, CHAMFER_1_SIZE_2 * 0.210138760575), (-CHAMFER_1_SIZE * 0.210138760767, CHAMFER_1_SIZE * 0.977671571246), (0, 0), align=None)
    chamfer_1_piece_26 = extrude(amount=22.113278464, mode=Mode.PRIVATE)
    chamfer_1_piece_26 = split(chamfer_1_piece_26, bisect_by=Plane(origin=(0.700293878, -0.28, 3.033333333), z_dir=(0, -1, 0)), keep=Keep.TOP, mode=Mode.PRIVATE)
    chamfer_1_piece_26 = split(chamfer_1_piece_26, bisect_by=Plane(origin=(0.700293878, -2.26, 3.033333333), z_dir=(0, 1, 0)), keep=Keep.TOP, mode=Mode.PRIVATE)
    add(chamfer_1_piece_26, mode=Mode.SUBTRACT)
    with BuildSketch(Plane(origin=(0.7, -14.866639232, 5.33), x_dir=(0.9776715712462587, 0, 0.2101387607674309), z_dir=(0, 1, 0))) as chamfer_1_piece_27_section:
        Polygon((CHAMFER_1_SIZE_2 * 0.977671570353, CHAMFER_1_SIZE_2 * 0.210138760575), (-CHAMFER_1_SIZE * 0.210138760767, CHAMFER_1_SIZE * 0.977671571246), (0, 0), align=None)
    chamfer_1_piece_27 = extrude(amount=22.113278464, mode=Mode.PRIVATE)
    chamfer_1_piece_27 = split(chamfer_1_piece_27, bisect_by=Plane(origin=(0.700293878, 0.28, 3.033333333), z_dir=(0, 1, 0)), keep=Keep.TOP, mode=Mode.PRIVATE)
    add(chamfer_1_piece_27, mode=Mode.SUBTRACT)

    # Эскиз6 → Вырез-Вытянуть1 (cut)
    with BuildSketch(Plane.XY.offset(5.33)):
        with Locations((3.8, 0.864447944)):
            Circle(SKETCH_6_R)
    extrude(amount=-CUT_EXTRUDE_1_DEPTH, mode=Mode.SUBTRACT)

    # Эскиз7 → Вырез-Вытянуть2 (cut)
    with BuildSketch(Plane.XY.offset(5.33)):
        with Locations((4.103600287, -8.176143791)):
            Rectangle(SKETCH_7_W, SKETCH_7_H)
    extrude(amount=-CUT_EXTRUDE_2_DEPTH, mode=Mode.SUBTRACT)

    # Фаска2
    chamfer_2_edges = [part.edges().sort_by_distance(p)[0] for p in [
        (3.8, -6.35, 0.38),
        (3.8, -6.35, 5.33),
    ]]
    chamfer_2_side = [part.faces().sort_by_distance(p)[0] for p in [
        (3.8, -6.35, 2.855),
    ]]
    chamfer(chamfer_2_edges, length=CHAMFER_2_SIZE, length2=CHAMFER_2_SIZE2, reference=chamfer_2_side[0])

    # Эскиз8 → Вырез-Вытянуть3 (cut)
    with BuildSketch(Plane(origin=(0, 0, -4.1), x_dir=(-1, 0, 0), z_dir=(0, 0, -1))):
        Circle(SKETCH_8_R)
    extrude(amount=-CUT_EXTRUDE_3_DEPTH, mode=Mode.SUBTRACT)


solid = part.part
